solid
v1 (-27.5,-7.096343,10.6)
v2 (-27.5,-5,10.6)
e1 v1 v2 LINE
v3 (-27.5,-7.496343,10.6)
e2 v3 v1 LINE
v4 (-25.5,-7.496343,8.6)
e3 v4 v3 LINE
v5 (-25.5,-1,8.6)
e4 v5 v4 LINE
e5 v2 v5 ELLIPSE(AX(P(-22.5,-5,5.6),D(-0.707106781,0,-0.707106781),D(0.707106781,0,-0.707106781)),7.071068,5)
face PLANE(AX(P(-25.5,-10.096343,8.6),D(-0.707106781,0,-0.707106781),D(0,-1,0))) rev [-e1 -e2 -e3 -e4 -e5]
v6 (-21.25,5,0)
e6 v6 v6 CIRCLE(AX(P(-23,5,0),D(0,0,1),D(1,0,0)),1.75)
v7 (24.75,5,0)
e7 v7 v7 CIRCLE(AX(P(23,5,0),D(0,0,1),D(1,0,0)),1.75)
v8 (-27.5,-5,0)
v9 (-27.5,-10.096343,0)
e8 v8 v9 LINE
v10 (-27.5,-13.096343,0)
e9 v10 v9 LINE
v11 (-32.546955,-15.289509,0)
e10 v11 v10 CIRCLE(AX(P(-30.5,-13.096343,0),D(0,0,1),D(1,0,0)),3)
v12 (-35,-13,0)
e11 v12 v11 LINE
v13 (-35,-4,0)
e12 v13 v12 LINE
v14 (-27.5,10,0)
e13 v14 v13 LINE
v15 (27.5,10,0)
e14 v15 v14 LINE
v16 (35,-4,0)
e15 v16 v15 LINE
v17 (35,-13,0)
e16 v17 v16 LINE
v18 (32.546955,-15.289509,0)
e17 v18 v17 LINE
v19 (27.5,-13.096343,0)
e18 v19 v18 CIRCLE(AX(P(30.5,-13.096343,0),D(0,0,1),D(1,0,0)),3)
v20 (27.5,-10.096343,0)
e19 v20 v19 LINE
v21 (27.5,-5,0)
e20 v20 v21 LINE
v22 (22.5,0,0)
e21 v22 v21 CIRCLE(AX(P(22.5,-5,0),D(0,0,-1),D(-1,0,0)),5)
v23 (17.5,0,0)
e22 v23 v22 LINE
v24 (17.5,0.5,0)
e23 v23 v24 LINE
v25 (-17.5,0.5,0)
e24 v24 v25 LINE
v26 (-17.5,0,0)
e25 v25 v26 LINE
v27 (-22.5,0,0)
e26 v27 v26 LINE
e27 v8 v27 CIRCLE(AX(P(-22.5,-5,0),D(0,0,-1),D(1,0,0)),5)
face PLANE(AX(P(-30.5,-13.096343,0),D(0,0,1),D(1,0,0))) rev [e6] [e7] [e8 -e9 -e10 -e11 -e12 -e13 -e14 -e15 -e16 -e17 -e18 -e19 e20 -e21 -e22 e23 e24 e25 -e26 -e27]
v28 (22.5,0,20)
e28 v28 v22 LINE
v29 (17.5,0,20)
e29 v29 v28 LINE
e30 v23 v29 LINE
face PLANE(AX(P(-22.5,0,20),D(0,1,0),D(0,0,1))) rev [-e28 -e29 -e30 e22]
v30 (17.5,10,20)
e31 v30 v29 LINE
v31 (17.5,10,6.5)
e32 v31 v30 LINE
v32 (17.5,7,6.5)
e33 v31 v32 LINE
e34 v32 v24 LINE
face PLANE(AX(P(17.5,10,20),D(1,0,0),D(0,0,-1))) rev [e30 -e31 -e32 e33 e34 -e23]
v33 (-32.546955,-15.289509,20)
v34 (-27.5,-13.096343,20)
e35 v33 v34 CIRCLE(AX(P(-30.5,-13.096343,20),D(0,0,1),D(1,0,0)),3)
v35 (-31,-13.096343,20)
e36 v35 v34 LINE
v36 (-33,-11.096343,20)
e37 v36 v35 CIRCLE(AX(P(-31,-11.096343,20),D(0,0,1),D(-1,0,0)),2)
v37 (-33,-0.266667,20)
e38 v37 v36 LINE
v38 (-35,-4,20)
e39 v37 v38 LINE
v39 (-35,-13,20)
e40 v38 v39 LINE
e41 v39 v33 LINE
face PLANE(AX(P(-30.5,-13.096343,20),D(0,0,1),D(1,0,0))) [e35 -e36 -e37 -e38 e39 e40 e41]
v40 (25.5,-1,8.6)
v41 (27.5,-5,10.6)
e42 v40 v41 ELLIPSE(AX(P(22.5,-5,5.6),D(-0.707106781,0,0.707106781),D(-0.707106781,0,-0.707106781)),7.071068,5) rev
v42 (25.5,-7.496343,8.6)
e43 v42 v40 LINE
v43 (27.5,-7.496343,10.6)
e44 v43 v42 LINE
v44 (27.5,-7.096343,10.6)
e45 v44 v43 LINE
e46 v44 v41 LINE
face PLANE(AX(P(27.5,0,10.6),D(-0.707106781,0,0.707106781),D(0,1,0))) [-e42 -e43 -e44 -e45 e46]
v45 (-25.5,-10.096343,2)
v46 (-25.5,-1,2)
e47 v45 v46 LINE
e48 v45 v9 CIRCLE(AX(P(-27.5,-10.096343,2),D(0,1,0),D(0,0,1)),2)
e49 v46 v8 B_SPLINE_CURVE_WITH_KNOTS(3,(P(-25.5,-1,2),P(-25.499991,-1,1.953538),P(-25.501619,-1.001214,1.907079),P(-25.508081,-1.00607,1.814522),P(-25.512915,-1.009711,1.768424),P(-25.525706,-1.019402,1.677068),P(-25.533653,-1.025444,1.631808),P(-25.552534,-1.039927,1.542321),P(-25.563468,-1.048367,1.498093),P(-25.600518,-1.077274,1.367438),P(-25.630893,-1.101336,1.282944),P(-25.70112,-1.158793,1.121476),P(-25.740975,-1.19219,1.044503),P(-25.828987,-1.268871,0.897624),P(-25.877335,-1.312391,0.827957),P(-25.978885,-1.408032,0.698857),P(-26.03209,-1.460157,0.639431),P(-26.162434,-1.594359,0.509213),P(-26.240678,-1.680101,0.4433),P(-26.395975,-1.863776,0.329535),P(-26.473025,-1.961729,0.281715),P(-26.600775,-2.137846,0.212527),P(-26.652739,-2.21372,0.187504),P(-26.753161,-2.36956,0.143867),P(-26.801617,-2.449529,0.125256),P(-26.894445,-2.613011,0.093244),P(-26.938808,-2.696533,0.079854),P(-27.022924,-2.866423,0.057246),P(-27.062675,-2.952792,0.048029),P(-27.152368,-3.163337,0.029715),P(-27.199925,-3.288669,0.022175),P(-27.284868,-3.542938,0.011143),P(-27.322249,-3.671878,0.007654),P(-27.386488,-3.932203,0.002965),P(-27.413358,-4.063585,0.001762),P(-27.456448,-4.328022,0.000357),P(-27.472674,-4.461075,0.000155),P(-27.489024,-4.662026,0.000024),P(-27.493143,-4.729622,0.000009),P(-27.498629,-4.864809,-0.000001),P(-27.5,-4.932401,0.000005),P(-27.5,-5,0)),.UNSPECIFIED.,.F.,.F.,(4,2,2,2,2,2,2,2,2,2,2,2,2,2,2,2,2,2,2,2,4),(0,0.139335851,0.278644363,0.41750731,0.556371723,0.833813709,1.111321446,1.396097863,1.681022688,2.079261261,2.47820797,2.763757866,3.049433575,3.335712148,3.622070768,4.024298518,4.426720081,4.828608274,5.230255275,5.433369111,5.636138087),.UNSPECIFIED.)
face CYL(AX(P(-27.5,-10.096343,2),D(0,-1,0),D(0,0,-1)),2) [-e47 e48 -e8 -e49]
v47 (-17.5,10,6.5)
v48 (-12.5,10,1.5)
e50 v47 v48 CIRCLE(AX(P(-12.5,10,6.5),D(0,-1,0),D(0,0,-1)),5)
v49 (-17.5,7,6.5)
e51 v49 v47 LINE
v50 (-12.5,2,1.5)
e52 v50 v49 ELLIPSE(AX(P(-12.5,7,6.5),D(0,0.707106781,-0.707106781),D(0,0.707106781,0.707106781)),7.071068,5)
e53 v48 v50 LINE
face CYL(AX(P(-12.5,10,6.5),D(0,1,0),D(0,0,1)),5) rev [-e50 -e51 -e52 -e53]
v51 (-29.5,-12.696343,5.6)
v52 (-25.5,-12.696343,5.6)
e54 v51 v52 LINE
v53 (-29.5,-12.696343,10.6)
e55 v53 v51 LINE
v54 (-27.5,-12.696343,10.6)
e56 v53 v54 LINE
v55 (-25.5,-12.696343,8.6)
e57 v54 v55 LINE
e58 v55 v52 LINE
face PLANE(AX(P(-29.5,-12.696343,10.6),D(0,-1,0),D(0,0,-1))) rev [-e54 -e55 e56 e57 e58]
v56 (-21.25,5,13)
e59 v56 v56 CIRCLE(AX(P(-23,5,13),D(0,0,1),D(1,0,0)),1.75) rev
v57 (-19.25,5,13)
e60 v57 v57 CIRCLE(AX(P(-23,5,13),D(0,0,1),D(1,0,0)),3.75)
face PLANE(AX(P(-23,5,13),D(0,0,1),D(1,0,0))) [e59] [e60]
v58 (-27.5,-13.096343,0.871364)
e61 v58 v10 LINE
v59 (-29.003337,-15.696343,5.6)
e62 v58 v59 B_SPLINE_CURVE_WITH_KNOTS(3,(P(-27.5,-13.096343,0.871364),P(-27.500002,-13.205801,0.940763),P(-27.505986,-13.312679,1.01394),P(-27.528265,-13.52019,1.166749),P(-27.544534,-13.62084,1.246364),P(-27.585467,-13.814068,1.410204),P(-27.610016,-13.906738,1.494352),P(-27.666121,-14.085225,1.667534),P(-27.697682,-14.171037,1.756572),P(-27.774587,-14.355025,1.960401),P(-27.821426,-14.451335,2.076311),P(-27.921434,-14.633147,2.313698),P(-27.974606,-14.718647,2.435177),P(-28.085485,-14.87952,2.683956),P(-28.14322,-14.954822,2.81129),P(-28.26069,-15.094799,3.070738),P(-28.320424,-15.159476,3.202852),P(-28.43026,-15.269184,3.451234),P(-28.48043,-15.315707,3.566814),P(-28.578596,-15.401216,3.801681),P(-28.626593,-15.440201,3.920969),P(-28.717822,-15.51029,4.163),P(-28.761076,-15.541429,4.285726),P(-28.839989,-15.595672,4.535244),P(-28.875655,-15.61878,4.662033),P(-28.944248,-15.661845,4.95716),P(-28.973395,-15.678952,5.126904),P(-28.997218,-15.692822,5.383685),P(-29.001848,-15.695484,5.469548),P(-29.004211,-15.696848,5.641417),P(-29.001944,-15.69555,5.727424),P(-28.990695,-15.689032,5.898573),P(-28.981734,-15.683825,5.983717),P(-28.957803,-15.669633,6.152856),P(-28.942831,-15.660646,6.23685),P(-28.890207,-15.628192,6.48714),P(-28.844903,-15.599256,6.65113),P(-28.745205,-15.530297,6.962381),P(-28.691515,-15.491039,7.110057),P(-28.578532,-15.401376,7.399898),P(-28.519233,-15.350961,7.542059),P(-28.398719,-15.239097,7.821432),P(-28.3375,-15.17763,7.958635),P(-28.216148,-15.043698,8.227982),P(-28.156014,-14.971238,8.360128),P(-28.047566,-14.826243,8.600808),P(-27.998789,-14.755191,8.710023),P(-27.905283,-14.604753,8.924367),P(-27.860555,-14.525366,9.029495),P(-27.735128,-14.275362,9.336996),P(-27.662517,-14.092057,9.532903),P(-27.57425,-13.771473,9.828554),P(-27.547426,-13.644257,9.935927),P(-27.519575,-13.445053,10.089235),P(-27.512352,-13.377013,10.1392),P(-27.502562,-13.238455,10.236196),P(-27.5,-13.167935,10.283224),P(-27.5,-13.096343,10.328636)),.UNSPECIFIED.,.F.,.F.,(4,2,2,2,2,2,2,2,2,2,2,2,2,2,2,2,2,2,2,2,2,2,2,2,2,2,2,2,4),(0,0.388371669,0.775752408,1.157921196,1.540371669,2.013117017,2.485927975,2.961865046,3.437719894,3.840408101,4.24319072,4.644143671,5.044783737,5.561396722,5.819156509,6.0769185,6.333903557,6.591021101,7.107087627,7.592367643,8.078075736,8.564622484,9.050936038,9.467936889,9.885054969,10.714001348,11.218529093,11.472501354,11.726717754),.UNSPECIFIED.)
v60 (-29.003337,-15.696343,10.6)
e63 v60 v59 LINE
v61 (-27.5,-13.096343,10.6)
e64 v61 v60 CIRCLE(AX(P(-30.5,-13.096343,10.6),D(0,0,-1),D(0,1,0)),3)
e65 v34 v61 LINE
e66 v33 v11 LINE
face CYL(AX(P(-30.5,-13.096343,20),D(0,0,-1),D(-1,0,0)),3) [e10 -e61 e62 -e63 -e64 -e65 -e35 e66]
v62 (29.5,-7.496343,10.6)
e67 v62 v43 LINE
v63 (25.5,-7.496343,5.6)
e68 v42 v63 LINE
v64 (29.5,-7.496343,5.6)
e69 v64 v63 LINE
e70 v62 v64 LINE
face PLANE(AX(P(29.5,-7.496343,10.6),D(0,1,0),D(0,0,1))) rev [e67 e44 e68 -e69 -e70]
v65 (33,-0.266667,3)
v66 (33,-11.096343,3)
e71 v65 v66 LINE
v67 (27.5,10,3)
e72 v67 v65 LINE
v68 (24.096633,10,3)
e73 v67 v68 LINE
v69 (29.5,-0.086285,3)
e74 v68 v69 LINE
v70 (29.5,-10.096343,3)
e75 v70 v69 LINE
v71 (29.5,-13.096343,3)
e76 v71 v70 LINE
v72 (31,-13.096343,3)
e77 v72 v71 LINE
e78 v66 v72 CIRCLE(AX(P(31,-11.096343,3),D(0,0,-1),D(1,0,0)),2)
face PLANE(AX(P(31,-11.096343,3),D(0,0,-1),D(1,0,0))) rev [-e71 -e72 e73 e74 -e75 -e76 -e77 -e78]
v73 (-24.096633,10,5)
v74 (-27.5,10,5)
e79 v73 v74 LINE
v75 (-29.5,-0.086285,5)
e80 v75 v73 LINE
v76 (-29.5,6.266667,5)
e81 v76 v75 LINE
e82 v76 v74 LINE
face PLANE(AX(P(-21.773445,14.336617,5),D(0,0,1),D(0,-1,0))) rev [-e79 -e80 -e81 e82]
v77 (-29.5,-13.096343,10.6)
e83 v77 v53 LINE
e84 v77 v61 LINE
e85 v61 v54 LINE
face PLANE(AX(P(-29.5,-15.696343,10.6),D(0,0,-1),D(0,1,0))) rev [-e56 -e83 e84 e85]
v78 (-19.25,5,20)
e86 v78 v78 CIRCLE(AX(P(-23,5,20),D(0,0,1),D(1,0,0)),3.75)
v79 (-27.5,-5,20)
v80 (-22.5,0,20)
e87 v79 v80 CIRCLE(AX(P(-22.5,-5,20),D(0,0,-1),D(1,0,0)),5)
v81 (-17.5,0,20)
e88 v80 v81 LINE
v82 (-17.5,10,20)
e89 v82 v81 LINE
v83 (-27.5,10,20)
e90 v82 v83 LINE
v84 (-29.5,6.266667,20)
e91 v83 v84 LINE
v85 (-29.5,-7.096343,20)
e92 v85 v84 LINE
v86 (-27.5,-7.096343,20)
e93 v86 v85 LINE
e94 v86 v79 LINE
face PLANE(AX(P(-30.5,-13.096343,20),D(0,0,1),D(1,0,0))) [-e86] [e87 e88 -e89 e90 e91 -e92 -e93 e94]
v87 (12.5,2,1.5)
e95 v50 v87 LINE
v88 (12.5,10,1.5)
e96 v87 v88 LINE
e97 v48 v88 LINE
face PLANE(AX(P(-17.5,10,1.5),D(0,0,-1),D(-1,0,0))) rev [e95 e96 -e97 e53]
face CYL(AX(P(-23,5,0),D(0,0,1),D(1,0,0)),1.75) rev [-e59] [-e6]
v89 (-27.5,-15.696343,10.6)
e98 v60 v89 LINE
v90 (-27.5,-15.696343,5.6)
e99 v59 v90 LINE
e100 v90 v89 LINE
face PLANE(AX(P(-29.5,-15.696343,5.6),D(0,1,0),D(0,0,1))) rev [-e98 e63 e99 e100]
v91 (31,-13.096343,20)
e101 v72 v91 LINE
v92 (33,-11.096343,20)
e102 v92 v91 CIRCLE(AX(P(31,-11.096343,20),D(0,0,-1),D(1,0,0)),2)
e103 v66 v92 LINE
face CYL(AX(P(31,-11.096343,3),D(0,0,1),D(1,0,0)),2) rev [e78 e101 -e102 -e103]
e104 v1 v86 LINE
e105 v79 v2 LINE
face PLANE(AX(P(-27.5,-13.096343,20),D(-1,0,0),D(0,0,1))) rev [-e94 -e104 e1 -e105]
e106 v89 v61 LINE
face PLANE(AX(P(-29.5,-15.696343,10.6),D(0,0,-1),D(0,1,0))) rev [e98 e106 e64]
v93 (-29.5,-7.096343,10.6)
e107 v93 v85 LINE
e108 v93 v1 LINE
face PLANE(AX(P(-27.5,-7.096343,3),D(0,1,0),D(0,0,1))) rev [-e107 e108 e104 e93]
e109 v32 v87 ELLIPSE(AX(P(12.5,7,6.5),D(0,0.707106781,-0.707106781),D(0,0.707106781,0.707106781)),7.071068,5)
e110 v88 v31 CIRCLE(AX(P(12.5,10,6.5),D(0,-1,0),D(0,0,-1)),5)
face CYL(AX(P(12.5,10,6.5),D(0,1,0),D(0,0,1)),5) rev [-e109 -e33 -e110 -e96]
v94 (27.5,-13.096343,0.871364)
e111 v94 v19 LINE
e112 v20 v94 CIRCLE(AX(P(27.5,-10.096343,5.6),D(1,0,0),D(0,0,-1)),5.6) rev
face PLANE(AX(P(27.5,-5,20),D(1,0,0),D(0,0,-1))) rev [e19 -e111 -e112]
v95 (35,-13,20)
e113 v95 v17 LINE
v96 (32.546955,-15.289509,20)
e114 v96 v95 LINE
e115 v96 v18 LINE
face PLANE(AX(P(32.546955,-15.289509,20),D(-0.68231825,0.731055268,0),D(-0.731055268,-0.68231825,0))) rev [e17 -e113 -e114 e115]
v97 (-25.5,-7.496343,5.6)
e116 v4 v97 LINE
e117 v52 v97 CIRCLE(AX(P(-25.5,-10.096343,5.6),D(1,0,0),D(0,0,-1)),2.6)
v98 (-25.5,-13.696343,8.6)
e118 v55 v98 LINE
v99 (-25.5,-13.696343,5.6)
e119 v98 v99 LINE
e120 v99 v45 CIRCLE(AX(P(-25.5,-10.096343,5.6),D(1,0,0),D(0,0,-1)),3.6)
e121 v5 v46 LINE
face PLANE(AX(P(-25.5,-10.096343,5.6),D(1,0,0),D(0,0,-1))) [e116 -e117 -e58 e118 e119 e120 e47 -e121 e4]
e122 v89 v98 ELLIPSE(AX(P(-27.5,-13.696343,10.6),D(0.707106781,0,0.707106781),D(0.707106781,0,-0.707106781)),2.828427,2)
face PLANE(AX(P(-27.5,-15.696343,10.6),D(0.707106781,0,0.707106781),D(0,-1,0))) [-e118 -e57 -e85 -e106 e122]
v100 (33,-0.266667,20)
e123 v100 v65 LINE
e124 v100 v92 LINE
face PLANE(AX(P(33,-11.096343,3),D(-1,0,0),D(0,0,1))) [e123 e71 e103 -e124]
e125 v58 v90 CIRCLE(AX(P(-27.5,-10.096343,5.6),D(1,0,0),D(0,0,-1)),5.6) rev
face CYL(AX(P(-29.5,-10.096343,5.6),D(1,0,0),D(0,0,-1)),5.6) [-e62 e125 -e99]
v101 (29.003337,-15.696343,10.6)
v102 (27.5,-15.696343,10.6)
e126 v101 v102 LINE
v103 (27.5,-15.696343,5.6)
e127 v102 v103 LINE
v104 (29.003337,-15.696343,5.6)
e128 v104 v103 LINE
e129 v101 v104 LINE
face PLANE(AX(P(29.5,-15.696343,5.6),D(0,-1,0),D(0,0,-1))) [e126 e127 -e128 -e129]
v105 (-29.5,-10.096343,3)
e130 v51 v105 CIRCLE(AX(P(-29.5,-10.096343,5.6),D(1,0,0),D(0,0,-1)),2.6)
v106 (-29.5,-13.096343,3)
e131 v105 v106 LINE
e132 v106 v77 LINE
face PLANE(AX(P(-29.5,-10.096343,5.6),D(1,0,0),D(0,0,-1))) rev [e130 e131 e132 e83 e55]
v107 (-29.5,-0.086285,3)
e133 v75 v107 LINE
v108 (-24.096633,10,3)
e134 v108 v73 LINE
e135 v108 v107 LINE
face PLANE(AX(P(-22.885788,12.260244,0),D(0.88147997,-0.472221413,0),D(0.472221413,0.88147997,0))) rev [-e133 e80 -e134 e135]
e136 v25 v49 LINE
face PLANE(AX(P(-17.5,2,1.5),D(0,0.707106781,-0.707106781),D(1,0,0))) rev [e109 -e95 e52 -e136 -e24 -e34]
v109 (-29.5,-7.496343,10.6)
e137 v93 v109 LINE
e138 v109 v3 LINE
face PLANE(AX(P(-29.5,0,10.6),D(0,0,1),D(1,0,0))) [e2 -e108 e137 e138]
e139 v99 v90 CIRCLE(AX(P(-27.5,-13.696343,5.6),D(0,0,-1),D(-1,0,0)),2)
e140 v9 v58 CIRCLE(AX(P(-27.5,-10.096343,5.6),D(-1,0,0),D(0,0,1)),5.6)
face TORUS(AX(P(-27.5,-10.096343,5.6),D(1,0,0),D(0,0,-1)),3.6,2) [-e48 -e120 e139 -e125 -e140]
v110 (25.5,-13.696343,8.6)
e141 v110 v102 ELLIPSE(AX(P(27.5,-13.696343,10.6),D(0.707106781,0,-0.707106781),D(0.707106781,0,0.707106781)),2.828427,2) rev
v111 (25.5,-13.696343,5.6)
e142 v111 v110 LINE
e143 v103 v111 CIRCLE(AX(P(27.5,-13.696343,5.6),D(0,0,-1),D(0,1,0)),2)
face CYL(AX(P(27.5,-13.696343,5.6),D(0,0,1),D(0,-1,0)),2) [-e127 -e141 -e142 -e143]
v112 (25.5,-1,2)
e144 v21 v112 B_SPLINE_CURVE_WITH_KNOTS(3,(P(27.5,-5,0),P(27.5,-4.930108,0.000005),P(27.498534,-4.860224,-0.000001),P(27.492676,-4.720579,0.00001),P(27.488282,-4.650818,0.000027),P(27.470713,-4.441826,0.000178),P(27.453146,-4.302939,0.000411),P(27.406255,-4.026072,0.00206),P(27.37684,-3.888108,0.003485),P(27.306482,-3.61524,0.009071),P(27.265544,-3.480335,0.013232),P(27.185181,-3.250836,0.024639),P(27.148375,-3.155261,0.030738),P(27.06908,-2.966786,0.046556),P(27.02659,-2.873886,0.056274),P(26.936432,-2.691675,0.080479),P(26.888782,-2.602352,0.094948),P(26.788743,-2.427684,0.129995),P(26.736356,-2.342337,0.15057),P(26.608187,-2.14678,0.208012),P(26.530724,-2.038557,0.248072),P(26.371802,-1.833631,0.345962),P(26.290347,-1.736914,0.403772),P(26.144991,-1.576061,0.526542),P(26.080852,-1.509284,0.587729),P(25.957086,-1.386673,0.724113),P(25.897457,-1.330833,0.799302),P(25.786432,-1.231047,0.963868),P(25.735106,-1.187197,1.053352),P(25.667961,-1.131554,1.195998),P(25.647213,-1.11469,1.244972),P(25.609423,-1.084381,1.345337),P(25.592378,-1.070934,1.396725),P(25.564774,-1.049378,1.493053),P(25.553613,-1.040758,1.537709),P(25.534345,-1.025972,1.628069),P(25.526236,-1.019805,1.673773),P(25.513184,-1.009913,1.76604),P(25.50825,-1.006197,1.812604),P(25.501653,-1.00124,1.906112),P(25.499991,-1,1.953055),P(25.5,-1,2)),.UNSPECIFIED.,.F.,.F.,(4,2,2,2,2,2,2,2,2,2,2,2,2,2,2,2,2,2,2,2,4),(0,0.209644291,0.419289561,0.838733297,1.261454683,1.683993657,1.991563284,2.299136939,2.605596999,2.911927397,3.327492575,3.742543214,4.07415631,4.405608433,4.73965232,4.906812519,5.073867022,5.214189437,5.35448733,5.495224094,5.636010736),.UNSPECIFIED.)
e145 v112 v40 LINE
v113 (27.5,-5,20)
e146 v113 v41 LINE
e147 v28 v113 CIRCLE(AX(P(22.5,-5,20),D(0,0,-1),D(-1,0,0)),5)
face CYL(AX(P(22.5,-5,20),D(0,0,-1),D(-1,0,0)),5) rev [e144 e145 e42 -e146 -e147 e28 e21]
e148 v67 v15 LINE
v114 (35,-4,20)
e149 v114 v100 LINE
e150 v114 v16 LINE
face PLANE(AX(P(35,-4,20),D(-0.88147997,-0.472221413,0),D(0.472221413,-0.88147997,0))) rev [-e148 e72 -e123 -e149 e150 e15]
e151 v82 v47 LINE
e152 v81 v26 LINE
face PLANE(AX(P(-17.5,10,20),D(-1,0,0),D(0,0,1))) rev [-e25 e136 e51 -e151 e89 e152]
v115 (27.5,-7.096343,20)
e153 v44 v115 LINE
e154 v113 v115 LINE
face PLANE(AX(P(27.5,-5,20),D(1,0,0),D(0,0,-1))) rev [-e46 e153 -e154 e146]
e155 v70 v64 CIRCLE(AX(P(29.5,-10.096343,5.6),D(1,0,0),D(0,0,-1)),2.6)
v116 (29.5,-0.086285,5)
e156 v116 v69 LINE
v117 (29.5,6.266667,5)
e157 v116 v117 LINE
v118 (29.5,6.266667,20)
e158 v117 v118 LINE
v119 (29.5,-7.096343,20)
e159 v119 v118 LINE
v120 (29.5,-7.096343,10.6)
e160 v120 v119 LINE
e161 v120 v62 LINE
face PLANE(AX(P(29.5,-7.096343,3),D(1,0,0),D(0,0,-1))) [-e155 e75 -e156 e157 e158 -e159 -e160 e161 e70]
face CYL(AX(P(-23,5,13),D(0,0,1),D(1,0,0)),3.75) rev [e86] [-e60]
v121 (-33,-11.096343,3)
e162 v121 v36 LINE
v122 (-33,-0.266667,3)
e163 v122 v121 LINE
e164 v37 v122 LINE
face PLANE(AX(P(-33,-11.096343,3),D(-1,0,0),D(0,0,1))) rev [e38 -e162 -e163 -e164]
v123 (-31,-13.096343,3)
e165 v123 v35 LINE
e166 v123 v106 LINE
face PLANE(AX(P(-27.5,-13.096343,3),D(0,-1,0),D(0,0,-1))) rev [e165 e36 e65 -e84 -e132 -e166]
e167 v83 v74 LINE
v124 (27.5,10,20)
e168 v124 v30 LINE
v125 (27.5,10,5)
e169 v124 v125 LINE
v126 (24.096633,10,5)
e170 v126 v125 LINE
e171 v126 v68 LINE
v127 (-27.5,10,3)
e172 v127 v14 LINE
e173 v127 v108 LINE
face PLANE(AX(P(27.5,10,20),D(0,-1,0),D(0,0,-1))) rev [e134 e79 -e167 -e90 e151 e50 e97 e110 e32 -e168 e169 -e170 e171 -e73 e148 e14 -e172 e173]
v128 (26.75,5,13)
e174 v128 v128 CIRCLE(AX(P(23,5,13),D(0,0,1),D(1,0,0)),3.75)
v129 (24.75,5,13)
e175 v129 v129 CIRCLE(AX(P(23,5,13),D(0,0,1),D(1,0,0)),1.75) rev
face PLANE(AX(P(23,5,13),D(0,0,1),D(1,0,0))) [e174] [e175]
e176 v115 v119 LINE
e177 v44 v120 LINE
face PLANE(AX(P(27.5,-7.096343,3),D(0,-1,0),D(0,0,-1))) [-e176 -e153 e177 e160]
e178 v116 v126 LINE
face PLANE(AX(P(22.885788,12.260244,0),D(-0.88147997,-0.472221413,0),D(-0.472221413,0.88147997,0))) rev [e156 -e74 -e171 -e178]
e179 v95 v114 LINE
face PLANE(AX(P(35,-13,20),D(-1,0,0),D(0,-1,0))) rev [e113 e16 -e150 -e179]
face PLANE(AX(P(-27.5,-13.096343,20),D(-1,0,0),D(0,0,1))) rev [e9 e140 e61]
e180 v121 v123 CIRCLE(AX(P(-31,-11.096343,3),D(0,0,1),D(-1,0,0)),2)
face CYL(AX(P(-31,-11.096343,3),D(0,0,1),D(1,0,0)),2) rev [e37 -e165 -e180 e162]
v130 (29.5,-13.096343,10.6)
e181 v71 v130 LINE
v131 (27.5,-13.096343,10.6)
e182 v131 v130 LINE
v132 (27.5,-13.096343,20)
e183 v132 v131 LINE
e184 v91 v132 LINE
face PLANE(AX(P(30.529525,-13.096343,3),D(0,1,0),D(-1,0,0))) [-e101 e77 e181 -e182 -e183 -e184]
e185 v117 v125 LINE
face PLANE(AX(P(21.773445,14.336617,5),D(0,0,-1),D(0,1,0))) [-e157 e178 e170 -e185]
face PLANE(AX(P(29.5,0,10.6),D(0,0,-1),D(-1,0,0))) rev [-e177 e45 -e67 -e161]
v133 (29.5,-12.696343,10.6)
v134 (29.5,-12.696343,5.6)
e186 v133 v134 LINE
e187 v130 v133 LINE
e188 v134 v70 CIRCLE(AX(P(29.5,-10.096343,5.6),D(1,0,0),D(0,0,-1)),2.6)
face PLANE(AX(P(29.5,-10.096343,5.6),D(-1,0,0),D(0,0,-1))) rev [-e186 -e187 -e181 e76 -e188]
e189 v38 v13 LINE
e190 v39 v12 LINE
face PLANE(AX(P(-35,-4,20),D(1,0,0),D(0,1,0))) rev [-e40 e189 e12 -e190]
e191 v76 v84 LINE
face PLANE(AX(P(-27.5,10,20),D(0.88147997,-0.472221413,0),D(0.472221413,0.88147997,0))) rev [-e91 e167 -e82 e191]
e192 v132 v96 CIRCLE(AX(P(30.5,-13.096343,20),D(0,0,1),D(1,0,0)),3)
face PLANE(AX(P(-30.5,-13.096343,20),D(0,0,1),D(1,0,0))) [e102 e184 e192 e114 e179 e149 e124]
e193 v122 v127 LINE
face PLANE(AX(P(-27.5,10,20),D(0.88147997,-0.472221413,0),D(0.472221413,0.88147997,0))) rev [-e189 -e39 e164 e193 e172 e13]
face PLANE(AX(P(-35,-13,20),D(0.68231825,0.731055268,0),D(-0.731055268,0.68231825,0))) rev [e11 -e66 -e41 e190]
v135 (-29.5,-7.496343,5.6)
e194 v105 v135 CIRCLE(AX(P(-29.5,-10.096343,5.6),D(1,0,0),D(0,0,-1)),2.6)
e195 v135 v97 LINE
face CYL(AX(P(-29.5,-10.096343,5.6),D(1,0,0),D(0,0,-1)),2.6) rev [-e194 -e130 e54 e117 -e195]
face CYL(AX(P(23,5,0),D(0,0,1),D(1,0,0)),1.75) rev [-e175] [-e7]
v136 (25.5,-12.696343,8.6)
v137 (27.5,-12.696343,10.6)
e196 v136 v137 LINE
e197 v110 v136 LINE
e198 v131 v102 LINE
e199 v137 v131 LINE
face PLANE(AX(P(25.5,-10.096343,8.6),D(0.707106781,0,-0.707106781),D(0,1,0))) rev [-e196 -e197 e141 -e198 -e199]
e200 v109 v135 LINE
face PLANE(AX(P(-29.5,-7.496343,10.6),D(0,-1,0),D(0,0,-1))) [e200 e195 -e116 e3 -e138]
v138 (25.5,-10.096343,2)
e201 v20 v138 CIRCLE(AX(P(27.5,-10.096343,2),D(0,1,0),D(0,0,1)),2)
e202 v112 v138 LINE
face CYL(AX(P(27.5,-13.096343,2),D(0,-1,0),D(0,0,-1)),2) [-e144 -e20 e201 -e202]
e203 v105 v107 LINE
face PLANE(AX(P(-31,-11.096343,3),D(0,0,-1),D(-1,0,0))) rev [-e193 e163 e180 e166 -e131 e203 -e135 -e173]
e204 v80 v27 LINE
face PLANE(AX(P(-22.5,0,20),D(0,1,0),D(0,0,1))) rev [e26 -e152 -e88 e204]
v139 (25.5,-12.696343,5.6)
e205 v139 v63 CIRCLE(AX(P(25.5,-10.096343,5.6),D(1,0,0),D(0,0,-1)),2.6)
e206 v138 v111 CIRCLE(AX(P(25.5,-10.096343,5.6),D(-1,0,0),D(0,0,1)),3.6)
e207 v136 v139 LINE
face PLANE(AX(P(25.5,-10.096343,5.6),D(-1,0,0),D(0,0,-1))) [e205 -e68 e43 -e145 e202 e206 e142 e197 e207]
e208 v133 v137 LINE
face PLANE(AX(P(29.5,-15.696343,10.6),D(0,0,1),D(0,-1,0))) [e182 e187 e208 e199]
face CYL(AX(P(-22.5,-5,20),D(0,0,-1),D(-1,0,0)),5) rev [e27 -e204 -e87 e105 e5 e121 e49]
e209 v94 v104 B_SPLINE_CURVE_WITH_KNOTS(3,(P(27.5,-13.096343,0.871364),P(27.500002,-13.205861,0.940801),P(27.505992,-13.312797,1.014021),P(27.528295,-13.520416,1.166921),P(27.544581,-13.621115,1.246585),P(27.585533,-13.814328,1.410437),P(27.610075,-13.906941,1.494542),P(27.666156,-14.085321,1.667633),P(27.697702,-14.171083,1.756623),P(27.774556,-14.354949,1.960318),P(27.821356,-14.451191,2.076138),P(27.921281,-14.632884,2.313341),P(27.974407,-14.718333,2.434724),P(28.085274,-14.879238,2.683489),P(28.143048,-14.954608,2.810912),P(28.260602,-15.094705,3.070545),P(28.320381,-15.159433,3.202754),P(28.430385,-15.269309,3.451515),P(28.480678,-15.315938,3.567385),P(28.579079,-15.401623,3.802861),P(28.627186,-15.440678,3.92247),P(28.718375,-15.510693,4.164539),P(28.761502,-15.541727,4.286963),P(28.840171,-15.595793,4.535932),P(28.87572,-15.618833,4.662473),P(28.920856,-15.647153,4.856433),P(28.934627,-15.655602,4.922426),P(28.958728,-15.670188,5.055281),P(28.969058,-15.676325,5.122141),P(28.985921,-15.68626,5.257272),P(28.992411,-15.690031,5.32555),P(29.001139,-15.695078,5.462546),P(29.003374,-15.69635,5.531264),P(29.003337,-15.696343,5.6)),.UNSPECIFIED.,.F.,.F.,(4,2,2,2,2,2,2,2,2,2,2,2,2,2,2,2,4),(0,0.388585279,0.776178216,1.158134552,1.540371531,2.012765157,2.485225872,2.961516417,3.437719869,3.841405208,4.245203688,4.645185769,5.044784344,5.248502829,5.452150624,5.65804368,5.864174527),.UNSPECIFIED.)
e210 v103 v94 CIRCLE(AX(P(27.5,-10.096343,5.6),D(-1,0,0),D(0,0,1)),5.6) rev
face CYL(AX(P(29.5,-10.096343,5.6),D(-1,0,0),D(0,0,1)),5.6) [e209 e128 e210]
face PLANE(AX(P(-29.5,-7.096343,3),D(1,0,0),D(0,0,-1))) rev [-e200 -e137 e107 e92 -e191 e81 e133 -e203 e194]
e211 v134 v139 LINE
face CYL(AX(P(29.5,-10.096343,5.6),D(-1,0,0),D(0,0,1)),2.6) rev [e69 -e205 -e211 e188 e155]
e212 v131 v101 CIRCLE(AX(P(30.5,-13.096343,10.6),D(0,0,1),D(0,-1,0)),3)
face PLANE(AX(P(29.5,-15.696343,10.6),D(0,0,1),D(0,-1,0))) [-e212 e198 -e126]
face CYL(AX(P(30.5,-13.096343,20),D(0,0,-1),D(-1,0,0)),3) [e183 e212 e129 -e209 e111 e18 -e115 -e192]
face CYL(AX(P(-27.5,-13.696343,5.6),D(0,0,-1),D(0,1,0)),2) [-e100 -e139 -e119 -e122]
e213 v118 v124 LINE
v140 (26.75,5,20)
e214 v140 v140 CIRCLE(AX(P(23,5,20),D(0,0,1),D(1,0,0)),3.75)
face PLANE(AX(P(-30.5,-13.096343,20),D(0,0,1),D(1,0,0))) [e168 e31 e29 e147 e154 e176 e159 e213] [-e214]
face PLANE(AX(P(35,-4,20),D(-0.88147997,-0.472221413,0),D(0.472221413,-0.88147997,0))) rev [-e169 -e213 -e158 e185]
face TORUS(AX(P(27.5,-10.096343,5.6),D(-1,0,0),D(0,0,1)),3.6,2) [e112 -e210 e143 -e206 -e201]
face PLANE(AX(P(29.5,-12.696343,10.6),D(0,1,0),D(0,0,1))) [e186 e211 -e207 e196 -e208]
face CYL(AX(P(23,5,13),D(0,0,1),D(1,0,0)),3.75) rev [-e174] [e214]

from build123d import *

# Parameters (mm, degrees)
BOSS_EXTRUDE1_DEPTH = 20
SKETCH3_W           = 35
SKETCH3_H           = 18.5
CUT_EXTRUDE2_DEPTH  = 44.406131606
CUT_EXTRUDE1_DEPTH  = 17
SKETCH5_R           = 1.75
CUT_EXTRUDE4_DEPTH  = 44.406131606
SKETCH6_R           = 3.75
CUT_EXTRUDE5_DEPTH  = 7
CHAMFER1_SIZE       = 2
FILLET1_R           = 5
BOSS_EXTRUDE5_DEPTH = 2
CHAMFER2_SIZE       = 2
FILLET2_R           = 2
SKETCH8_W           = 2
SKETCH8_H           = 17.504208533
CUT_EXTRUDE6_DEPTH  = 3


# Some blends are built 0.0001 mm under size
with BuildPart() as part:
    # Sketch1 → Boss-Extrude1 (new body)
    with BuildSketch(Plane.XY):
        with BuildLine():
            Line((-22.5, 0), (22.5, 0))
            ThreePointArc((22.5, 0), (26.035533906, -1.464466094), (27.5, -5))
            Line((27.5, -5), (27.5, -13.096343094))
            ThreePointArc((27.5, -13.096343094), (29.304354621, -15.847784921), (32.546954751, -15.289508899))
            Line((32.546954751, -15.289508899), (35, -13))
            Line((35, -13), (35, -4))
            Line((35, -4), (27.5, 10))
            Line((27.5, 10), (-27.5, 10))
            Line((-27.5, 10), (-35, -4))
            Line((-35, -4), (-35, -13))
            Line((-35, -13), (-32.546954751, -15.289508899))
            ThreePointArc((-32.546954751, -15.289508899), (-29.304354621, -15.847784921), (-27.5, -13.096343094))
            Line((-27.5, -13.096343094), (-27.5, -5))
            ThreePointArc((-27.5, -5), (-26.035533906, -1.464466094), (-22.5, 0))
        make_face()
    extrude(amount=BOSS_EXTRUDE1_DEPTH)

    # Sketch3 → Cut-Extrude2 (cut, through all)
    with BuildSketch(Plane.XZ):
        with Locations((0, 10.75)):
            Rectangle(SKETCH3_W, SKETCH3_H)
    extrude(amount=-CUT_EXTRUDE2_DEPTH, mode=Mode.SUBTRACT)

    # Sketch2 → Cut-Extrude1 (cut)
    with BuildSketch(Plane.XY.offset(20)):
        with BuildLine():
            Line((-27.5, -13.096343094), (-30.529524623, -13.096343094))
            Line((-30.529524623, -13.096343094), (-31, -13.096343094))
            ThreePointArc((-31, -13.096343094), (-32.414213562, -12.510556657), (-33, -11.096343094))
            Line((-33, -11.096343094), (-33, 8.594773791))
            Line((-33, 8.594773791), (-29.5, 8.594773791))
            Line((-29.5, 8.594773791), (-29.5, -7.096343094))
            Line((-29.5, -7.096343094), (-27.5, -7.096343094))
            Line((-27.5, -7.096343094), (-27.5, -13.096343094))
        make_face()
    cut_extrude1 = extrude(amount=-CUT_EXTRUDE1_DEPTH, mode=Mode.SUBTRACT)

    # Mirror1: Cut-Extrude1 across plane
    add(cut_extrude1.mirror(Plane(origin=(0, 0, 0), x_dir=(0, 0, 1), z_dir=(1, 0, 0))), mode=Mode.SUBTRACT)

    # Sketch5 → Cut-Extrude4 (cut, through all)
    with BuildSketch(Plane.XY.offset(20)):
        with Locations((-23, 5)):
            Circle(SKETCH5_R)
        with Locations((23, 5)):
            Circle(SKETCH5_R)
    extrude(amount=-CUT_EXTRUDE4_DEPTH, mode=Mode.SUBTRACT)

    # Sketch6 → Cut-Extrude5 (cut)
    with BuildSketch(Plane.XY.offset(20)):
        with Locations((-23, 5)):
            Circle(SKETCH6_R)
        with Locations((23, 5)):
            Circle(SKETCH6_R)
    extrude(amount=-CUT_EXTRUDE5_DEPTH, mode=Mode.SUBTRACT)

    # Chamfer1
    # the kernel refuses this chamfer: 2 mm, written as the material it takes off along each edge
    with BuildSketch(Plane(origin=(17.5, 0, 1.5), x_dir=(0, -0.027495876610586365, -0.9996219169112968), z_dir=(-1, 0, 0))) as chamfer1_piece_1:
        Polygon((CHAMFER1_SIZE * 0.999621916911, -CHAMFER1_SIZE * 0.0274958766106), (-CHAMFER1_SIZE * 0.0274958766106, -CHAMFER1_SIZE * 0.999621916911), (0, 0), align=None)
    extrude(amount=35, mode=Mode.SUBTRACT)

    # Fillet1
    fillet1_edges = [part.edges().sort_by_distance(p)[0] for p in [
        (-17.5, 6, 1.5),
        (17.5, 6, 1.5),
    ]]
    fillet(fillet1_edges, radius=FILLET1_R)

    # Sketch7 → Boss-Extrude5 (add, symmetric)
    with BuildSketch(Plane(origin=(-27.5, 0, 0), x_dir=(0, 0, -1), z_dir=(1, 0, 0))):
        with BuildLine():
            Line((0, -10.096343094), (0, 0))
            Line((0, 0), (-10.6, 0))
            Line((-10.6, 0), (-10.6, -7.496343094))
            Line((-10.6, -7.496343094), (-5.6, -7.496343094))
            ThreePointArc((-5.6, -7.496343094), (-3, -10.096343094), (-5.6, -12.696343094))
            Line((-5.6, -12.696343094), (-10.6, -12.696343094))
            Line((-10.6, -12.696343094), (-10.6, -15.696343094))
            Line((-10.6, -15.696343094), (-5.6, -15.696343094))
            ThreePointArc((-5.6, -15.696343094), (-1.640202025, -14.056141069), (0, -10.096343094))
        make_face()
    boss_extrude5 = extrude(amount=BOSS_EXTRUDE5_DEPTH, both=True)

    # Mirror4: Boss-Extrude5 across plane
    add(boss_extrude5.mirror(Plane(origin=(0, 0, 0), x_dir=(0, 0, 1), z_dir=(1, 0, 0))))

    # Chamfer2
    chamfer2_edges = [part.edges().sort_by_distance(p)[0] for p in [
        (25.5, -14.196343094, 10.6),
        (25.5, -4.248171547, 10.6),
        (-25.5, -4.248171547, 10.6),
        (-25.5, -14.196343094, 10.6),
    ]]
    chamfer(chamfer2_edges, length=CHAMFER2_SIZE - 0.0001)  # a hair under: the kernel refuses the full size

    # Fillet2
    fillet2_edges = [part.edges().sort_by_distance(p)[0] for p in [
        (25.5, -5.548171547, 0),
        (25.5, -14.056141069, 1.640202025),
        (-25.5, -5.548171547, 0),
        (-25.5, -14.056141069, 1.640202025),
        (25.5, -15.696343094, 7.10005),
        (-25.5, -15.696343094, 7.10005),
    ]]
    fillet(fillet2_edges, radius=FILLET2_R - 0.0001)  # a hair under: the kernel refuses the full size

    # Sketch8 → Cut-Extrude6 (cut)
    with BuildSketch(Plane(origin=(-25.530227948, 13.67690783, 0), x_dir=(0, 0, 1), z_dir=(-0.8814799700287818, 0.4722214125154193, 0))):
        with Locations((4, -6.39655042)):
            Rectangle(SKETCH8_W, SKETCH8_H)
    cut_extrude6 = extrude(amount=-CUT_EXTRUDE6_DEPTH, mode=Mode.SUBTRACT)

    # Mirror5: Cut-Extrude6 across plane
    add(cut_extrude6.mirror(Plane(origin=(0, 0, 0), x_dir=(0, 0, 1), z_dir=(1, 0, 0))), mode=Mode.SUBTRACT)


solid = part.part
